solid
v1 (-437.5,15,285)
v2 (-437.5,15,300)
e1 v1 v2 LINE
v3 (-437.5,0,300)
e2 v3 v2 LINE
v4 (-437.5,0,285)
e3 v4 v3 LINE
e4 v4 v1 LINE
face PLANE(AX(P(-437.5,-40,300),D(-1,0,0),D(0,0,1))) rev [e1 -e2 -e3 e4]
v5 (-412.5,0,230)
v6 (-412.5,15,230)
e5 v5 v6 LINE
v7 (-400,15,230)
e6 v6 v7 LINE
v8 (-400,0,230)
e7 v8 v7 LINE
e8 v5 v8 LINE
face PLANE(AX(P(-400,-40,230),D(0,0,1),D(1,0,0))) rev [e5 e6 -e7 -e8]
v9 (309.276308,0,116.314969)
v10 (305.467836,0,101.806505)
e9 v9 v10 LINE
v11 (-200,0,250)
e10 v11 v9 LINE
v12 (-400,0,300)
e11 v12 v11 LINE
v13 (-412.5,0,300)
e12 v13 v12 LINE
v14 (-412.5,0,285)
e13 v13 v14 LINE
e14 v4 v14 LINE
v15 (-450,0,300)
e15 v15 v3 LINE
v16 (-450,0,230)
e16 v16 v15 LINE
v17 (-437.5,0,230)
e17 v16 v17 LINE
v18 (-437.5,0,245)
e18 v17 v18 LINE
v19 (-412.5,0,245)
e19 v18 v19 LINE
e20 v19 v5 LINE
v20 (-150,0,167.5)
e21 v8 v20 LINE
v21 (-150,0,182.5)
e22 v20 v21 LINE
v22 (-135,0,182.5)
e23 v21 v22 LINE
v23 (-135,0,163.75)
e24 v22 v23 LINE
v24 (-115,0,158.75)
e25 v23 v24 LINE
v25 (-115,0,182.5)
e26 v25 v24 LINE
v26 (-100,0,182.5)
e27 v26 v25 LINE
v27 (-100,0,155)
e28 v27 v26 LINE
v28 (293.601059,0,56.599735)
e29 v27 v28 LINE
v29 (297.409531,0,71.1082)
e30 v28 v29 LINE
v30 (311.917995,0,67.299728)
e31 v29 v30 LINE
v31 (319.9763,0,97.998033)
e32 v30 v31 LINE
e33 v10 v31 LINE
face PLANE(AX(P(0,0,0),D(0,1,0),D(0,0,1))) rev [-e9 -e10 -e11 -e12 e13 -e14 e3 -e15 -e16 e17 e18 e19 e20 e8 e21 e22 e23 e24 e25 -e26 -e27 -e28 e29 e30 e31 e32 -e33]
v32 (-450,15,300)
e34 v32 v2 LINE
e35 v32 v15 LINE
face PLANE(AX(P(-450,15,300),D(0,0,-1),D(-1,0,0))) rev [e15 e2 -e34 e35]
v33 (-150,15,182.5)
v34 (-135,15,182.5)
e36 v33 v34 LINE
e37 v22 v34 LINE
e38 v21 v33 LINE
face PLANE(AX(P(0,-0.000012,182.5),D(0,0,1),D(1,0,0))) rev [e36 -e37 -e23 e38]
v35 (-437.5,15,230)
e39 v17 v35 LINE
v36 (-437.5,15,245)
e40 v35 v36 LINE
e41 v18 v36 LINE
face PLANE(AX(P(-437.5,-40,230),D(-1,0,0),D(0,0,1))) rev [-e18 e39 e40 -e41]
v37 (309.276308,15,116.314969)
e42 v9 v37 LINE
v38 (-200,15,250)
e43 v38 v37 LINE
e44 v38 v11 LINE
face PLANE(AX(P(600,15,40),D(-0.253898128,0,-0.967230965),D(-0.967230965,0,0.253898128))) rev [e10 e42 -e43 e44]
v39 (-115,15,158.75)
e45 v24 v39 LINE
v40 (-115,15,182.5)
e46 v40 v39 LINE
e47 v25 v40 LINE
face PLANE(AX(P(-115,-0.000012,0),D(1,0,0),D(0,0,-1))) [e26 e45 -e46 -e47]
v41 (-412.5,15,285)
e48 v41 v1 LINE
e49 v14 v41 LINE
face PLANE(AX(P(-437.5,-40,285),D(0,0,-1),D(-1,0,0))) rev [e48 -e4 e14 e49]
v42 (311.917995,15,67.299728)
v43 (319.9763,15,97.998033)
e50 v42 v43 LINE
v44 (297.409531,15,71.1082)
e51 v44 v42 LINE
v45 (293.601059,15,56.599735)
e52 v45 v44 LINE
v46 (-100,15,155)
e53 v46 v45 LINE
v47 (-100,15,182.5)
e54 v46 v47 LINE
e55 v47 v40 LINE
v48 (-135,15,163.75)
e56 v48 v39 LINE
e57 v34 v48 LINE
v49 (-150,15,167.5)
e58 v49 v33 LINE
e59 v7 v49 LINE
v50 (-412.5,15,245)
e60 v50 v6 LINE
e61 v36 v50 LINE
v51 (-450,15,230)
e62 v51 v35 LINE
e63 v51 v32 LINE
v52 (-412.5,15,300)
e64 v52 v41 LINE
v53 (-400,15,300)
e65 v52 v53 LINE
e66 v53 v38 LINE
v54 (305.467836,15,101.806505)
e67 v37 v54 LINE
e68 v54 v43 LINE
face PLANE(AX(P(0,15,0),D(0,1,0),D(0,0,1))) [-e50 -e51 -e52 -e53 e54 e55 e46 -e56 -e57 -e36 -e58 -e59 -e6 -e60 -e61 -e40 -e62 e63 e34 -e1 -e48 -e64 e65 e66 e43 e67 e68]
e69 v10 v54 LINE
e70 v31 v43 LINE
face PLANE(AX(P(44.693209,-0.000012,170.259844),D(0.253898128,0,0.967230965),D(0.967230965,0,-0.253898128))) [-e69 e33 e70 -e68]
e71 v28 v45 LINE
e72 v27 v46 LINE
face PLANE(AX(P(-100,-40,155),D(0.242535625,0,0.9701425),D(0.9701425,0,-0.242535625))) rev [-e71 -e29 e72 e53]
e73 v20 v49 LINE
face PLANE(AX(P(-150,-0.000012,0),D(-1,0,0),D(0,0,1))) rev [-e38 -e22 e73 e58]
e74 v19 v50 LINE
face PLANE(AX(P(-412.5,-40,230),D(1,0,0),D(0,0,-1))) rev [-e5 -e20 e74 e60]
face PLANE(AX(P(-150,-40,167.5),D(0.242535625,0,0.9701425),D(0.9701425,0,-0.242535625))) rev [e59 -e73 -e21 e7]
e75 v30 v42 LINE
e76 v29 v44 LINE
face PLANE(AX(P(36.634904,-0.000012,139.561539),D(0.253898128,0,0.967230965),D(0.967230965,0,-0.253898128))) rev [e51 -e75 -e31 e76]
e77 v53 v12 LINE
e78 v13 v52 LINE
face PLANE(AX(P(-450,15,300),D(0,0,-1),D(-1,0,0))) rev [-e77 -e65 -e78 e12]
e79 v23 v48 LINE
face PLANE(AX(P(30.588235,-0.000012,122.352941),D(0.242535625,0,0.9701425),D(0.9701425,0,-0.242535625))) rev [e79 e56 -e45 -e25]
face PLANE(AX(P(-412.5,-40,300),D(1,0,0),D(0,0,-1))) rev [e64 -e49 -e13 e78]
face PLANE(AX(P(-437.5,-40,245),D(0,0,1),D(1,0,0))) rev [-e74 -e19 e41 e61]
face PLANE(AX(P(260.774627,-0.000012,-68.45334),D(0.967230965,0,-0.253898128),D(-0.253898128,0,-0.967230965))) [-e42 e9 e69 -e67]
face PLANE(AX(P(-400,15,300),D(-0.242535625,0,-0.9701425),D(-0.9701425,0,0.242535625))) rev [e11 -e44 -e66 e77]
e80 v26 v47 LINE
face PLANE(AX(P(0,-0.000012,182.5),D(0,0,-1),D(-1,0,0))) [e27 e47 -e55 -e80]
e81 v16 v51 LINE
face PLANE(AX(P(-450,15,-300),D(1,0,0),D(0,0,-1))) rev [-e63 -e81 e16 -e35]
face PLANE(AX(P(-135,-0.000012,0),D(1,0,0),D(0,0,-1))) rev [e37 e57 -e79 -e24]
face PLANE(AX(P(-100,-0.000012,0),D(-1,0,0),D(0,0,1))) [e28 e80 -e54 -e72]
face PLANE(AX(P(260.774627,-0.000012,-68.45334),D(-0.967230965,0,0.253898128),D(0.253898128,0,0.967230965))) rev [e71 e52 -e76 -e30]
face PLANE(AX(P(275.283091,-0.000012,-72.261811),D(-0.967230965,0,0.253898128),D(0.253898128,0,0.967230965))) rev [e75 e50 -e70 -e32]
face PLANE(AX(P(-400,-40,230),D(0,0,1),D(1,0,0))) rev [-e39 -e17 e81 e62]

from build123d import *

# Parameters (mm, degrees)
BOSS_EXTRUDE1_DEPTH             = 15
BOSS_EXTRUDE2_REACH             = 1239.023
BOSS_EXTRUDE2_DIRECTION_2_REACH = 1239.023
CUT_EXTRUDE2_DEPTH              = 1238.578280352
CUT_EXTRUDE2_DEPTH_BACK         = 1238.578280352
SKETCH5_W                       = 40
SKETCH5_H                       = 40
CUT_EXTRUDE3_DEPTH              = 1238.578280352
BOSS_EXTRUDE4_DEPTH             = 75
CUT_EXTRUDE4_DEPTH              = 1241.107934819
CUT_EXTRUDE4_DEPTH_BACK         = 1241.107934819
SKETCH8_W                       = 15
SKETCH8_H                       = 73.7
FILLET1_R                       = 5
CUT_EXTRUDE5_DEPTH              = 1241.107934819
CUT_EXTRUDE5_DEPTH_BACK         = 1241.107934819
SKETCH9_W                       = 25
SKETCH9_H                       = 15
SKETCH9_W_2                     = 15
CUT_EXTRUDE6_DEPTH              = 1241.107934819
CUT_EXTRUDE6_DEPTH_BACK         = 1241.107934819
SKETCH10_W                      = 1728.920732784
SKETCH10_H                      = 178.853868908
SKETCH10_W_2                    = 1650
SKETCH10_H_2                    = 15
CUT_EXTRUDE9_DEPTH              = 1238.022635201
CUT_EXTRUDE9_DEPTH_BACK         = 1238.022635201
SKETCH11_W                      = 1852.680615207
SKETCH11_H                      = 1075.927112831


with BuildPart() as part:
    # Sketch1 → Boss-Extrude1 (new body)
    with BuildSketch(Plane(origin=(0, 0, 0), x_dir=(1, 0, 0), z_dir=(0, 1, 0))):
        Polygon((-450, 300), (-400, 300), (-200, 250), (600, 40), (1200, 40), (1200, -40), (600, -40), (-200, -250), (-400, -300), (-450, -300), align=None)
    extrude(amount=BOSS_EXTRUDE1_DEPTH)

    # Boss-Extrude2: up to this face of the body (flat: up to its plane)
    boss_extrude2_end = Plane(part.part.faces().sort_by_distance((-425, 7.5, 300))[0])
    # Sketch2 → Boss-Extrude2 (add, up to the picked face)
    with BuildSketch(Plane.XY, mode=Mode.PRIVATE) as boss_extrude2_sk1:
        with BuildLine():
            Line((-425, 0), (-450, 0))
            Line((-450, 0), (-450, -40))
            Line((-450, -40), (-440, -40))
            Line((-440, -40), (-440, -15))
            ThreePointArc((-440, -15), (-435.606601718, -4.393398282), (-425, 0))
        make_face()
    boss_extrude2_tool1 = split(extrude(boss_extrude2_sk1.sketch, amount=BOSS_EXTRUDE2_REACH, mode=Mode.PRIVATE), bisect_by=boss_extrude2_end, keep=Keep.BOTH, mode=Mode.PRIVATE)
    # Sketch2 → Boss-Extrude2 (add, up to the picked face)
    with BuildSketch(Plane.XY, mode=Mode.PRIVATE) as boss_extrude2_sk2:
        with BuildLine():
            Line((-400, 0), (-425, 0))
            ThreePointArc((-425, 0), (-414.393398282, -4.393398282), (-410, -15))
            Line((-410, -15), (-410, -40))
            Line((-410, -40), (-400, -40))
            Line((-400, -40), (-400, 0))
        make_face()
    boss_extrude2_tool2 = split(extrude(boss_extrude2_sk2.sketch, amount=BOSS_EXTRUDE2_REACH, mode=Mode.PRIVATE), bisect_by=boss_extrude2_end, keep=Keep.BOTH, mode=Mode.PRIVATE)
    add(boss_extrude2_tool1.solids().sort_by(Axis((-444.100555, -18.206662, 0), (0, 0, 1)))[0])
    add(boss_extrude2_tool2.solids().sort_by(Axis((-405.899445, -18.206662, 0), (0, 0, 1)))[0])

    # Boss-Extrude2 direction 2: up to this face of the body (flat: up to its plane)
    boss_extrude2_direction_2_end = Plane(part.part.faces().sort_by_distance((-425, 7.5, -300))[0])
    # Sketch2 → Boss-Extrude2 direction 2 (add, up to the picked face)
    with BuildSketch(Plane.XY, mode=Mode.PRIVATE) as boss_extrude2_direction_2_sk1:
        with BuildLine():
            Line((-425, 0), (-450, 0))
            Line((-450, 0), (-450, -40))
            Line((-450, -40), (-440, -40))
            Line((-440, -40), (-440, -15))
            ThreePointArc((-440, -15), (-435.606601718, -4.393398282), (-425, 0))
        make_face()
    boss_extrude2_direction_2_tool1 = split(extrude(boss_extrude2_direction_2_sk1.sketch, amount=-BOSS_EXTRUDE2_DIRECTION_2_REACH, mode=Mode.PRIVATE), bisect_by=boss_extrude2_direction_2_end, keep=Keep.BOTH, mode=Mode.PRIVATE)
    # Sketch2 → Boss-Extrude2 direction 2 (add, up to the picked face)
    with BuildSketch(Plane.XY, mode=Mode.PRIVATE) as boss_extrude2_direction_2_sk2:
        with BuildLine():
            Line((-400, 0), (-425, 0))
            ThreePointArc((-425, 0), (-414.393398282, -4.393398282), (-410, -15))
            Line((-410, -15), (-410, -40))
            Line((-410, -40), (-400, -40))
            Line((-400, -40), (-400, 0))
        make_face()
    boss_extrude2_direction_2_tool2 = split(extrude(boss_extrude2_direction_2_sk2.sketch, amount=-BOSS_EXTRUDE2_DIRECTION_2_REACH, mode=Mode.PRIVATE), bisect_by=boss_extrude2_direction_2_end, keep=Keep.BOTH, mode=Mode.PRIVATE)
    add(boss_extrude2_direction_2_tool1.solids().sort_by(Axis((-444.100555, -18.206662, 0), (0, 0, -1)))[0])
    add(boss_extrude2_direction_2_tool2.solids().sort_by(Axis((-405.899445, -18.206662, 0), (0, 0, -1)))[0])

    # Sketch4 → Cut-Extrude2 (cut, two sides: drawn at the far end of the back side and taken through both)
    with BuildSketch(Plane(origin=(0, 0, 0), x_dir=(1, 0, 0), z_dir=(0, 1, 0)).offset(-CUT_EXTRUDE2_DEPTH_BACK)):
        Polygon((-450, 230), (-400, 230), (-150, 167.5), (-150, -167.5), (-400, -230), (-450, -230), align=None)
        Polygon((-100, 155), (-100, -155), (520, 0), align=None)
    extrude(amount=CUT_EXTRUDE2_DEPTH + CUT_EXTRUDE2_DEPTH_BACK, mode=Mode.SUBTRACT)

    # Sketch5 → Cut-Extrude3 (cut, through all)
    with BuildSketch(Plane(origin=(0, 0, 0), x_dir=(0, 0, -1), z_dir=(1, 0, 0))):
        with Locations((-265, -20)):
            Rectangle(SKETCH5_W, SKETCH5_H)
        with Locations((265, -20)):
            Rectangle(SKETCH5_W, SKETCH5_H)
    extrude(amount=-CUT_EXTRUDE3_DEPTH, mode=Mode.SUBTRACT)

    # Sketch7 → Boss-Extrude4 (add)
    with BuildSketch(Plane(origin=(1200, 0, 0), x_dir=(0, 0, -1), z_dir=(1, 0, 0))):
        with BuildLine():
            Line((-87.5, 50), (-40, 15))
            Line((-40, 15), (40, 15))
            Line((40, 15), (87.5, 50))
            Line((87.5, 50), (87.5, 88.7))
            Line((87.5, 88.7), (58.5, 88.7))
            Line((58.5, 88.7), (58.5, 63.2))
            Line((58.5, 63.2), (48.5, 63.2))
            Line((48.5, 63.2), (48.5, 88.7))
            Line((48.5, 88.7), (20, 88.7))
            Line((20, 88.7), (20, 50))
            ThreePointArc((20, 50), (0, 30), (-20, 50))
            Line((-20, 50), (-20, 88.7))
            Line((-20, 88.7), (-63, 88.7))
            Line((-63, 88.7), (-63, 63.2))
            Line((-63, 63.2), (-73, 63.2))
            Line((-73, 63.2), (-73, 88.7))
            Line((-73, 88.7), (-87.5, 88.7))
            Line((-87.5, 88.7), (-87.5, 50))
        make_face()
    extrude(amount=-BOSS_EXTRUDE4_DEPTH)

    # Sketch8 → Cut-Extrude4 (cut, two sides: drawn at the far end of the back side and taken through both)
    with BuildSketch(Plane.XY.offset(-CUT_EXTRUDE4_DEPTH_BACK)):
        with Locations((1147.5, 51.85)):
            Rectangle(SKETCH8_W, SKETCH8_H)
        with Locations((1177.5, 51.85)):
            Rectangle(SKETCH8_W, SKETCH8_H)
    extrude(amount=CUT_EXTRUDE4_DEPTH + CUT_EXTRUDE4_DEPTH_BACK, mode=Mode.SUBTRACT)

    # Fillet1
    fillet1_edges = [part.edges().sort_by_distance(p)[0] for p in [
        (1192.5, 50, 87.5),
        (1162.5, 50, 87.5),
        (1132.5, 50, 87.5),
        (1192.5, 50, -87.5),
        (1162.5, 50, -87.5),
        (1132.5, 50, -87.5),
        (1192.5, 88.7, -87.5),
        (1162.5, 88.7, -87.5),
        (1132.5, 88.7, -87.5),
        (1132.5, 88.7, -58.5),
        (1162.5, 88.7, -58.5),
        (1192.5, 88.7, -58.5),
        (1192.5, 88.7, -48.5),
        (1162.5, 88.7, -48.5),
        (1132.5, 88.7, -48.5),
        (1192.5, 88.7, -20),
        (1162.5, 88.7, -20),
        (1132.5, 88.7, -20),
        (1192.5, 88.7, 63),
        (1162.5, 88.7, 63),
        (1132.5, 88.7, 63),
        (1132.5, 88.7, 87.5),
        (1162.5, 88.7, 87.5),
        (1192.5, 88.7, 87.5),
        (1192.5, 88.7, 73),
        (1162.5, 88.7, 73),
        (1132.5, 88.7, 73),
        (1192.5, 88.7, 20),
        (1162.5, 88.7, 20),
        (1132.5, 88.7, 20),
        (600, 7.5, 40),
        (600, 7.5, -40),
        (520, 7.5, 0),
        (-440, -40, -292.5),
        (-440, -40, -237.5),
        (-400, -40, -292.5),
        (-400, -40, -237.5),
        (-450, -40, -237.5),
        (-410, -40, -237.5),
        (-450, -40, -292.5),
        (-410, -40, -292.5),
        (-150, 7.5, 167.5),
        (-100, 7.5, 155),
        (-150, 7.5, -167.5),
        (-100, 7.5, -155),
        (-450, -40, 237.5),
        (-410, -40, 237.5),
        (-440, -40, 237.5),
        (-400, -40, 237.5),
        (-450, -40, 292.5),
        (-440, -40, 292.5),
        (-400, -40, 292.5),
        (-410, -40, 292.5),
    ]]
    fillet(fillet1_edges, radius=FILLET1_R - 0.0001)  # a hair under: the kernel refuses the full size

    # Sketch9 → Cut-Extrude5 (cut, two sides: drawn at the far end of the back side and taken through both)
    with BuildSketch(Plane(origin=(0, 0, 0), x_dir=(1, 0, 0), z_dir=(0, 1, 0)).offset(-CUT_EXTRUDE5_DEPTH_BACK)):
        with Locations((-425, -292.5)):
            Rectangle(SKETCH9_W, SKETCH9_H)
        with Locations((1192.5, -32.5)):
            Rectangle(SKETCH9_W_2, SKETCH9_H)
        with Locations((1192.5, 32.5)):
            Rectangle(SKETCH9_W_2, SKETCH9_H)
        with Locations((1162.5, 32.5)):
            Rectangle(SKETCH9_W_2, SKETCH9_H)
        with Locations((1132.5, 32.5)):
            Rectangle(SKETCH9_W_2, SKETCH9_H)
        with Locations((1132.5, -32.5)):
            Rectangle(SKETCH9_W_2, SKETCH9_H)
        with Locations((1162.5, -32.5)):
            Rectangle(SKETCH9_W_2, SKETCH9_H)
        with Locations((-425, -237.5)):
            Rectangle(SKETCH9_W, SKETCH9_H)
        with Locations((-425, 237.5)):
            Rectangle(SKETCH9_W, SKETCH9_H)
        with Locations((-425, 292.5)):
            Rectangle(SKETCH9_W, SKETCH9_H)
    extrude(amount=CUT_EXTRUDE5_DEPTH + CUT_EXTRUDE5_DEPTH_BACK, mode=Mode.SUBTRACT)


with BuildPart() as cut_extrude5_piece_1:
    # of the separate pieces the step leaves, piece 1, a body of its own (cut_extrude5_pieces)
    add(part.part.solids().sort_by_distance((-400, -35.0001, -300))[0])


with BuildPart() as cut_extrude5_piece_2:
    # of the separate pieces the step leaves, piece 2, a body of its own (cut_extrude5_pieces)
    add(part.part.solids().sort_by_distance((1170, 48.501289589, 85.46603587))[0])


with BuildPart() as cut_extrude5_piece_3:
    # of the separate pieces the step leaves, piece 3, a body of its own (cut_extrude5_pieces)
    add(part.part.solids().sort_by_distance((1170, 48.501289589, -85.46603587))[0])


with BuildPart() as cut_extrude5_piece_4:
    # of the separate pieces the step leaves, piece 4, a body of its own (cut_extrude5_pieces)
    add(part.part.solids().sort_by_distance((1125, 83.7001, 73))[0])


with BuildPart() as cut_extrude5_piece_5:
    # of the separate pieces the step leaves, piece 5, a body of its own (cut_extrude5_pieces)
    add(part.part.solids().sort_by_distance((1200, 48.501289589, 85.46603587))[0])


with BuildPart() as cut_extrude5_piece_6:
    # of the separate pieces the step leaves, piece 6, a body of its own (cut_extrude5_pieces)
    add(part.part.solids().sort_by_distance((1200, 48.501289589, -85.46603587))[0])


with BuildPart() as cut_extrude5_piece_7:
    # of the separate pieces the step leaves, piece 7, a body of its own (cut_extrude5_pieces)
    add(part.part.solids().sort_by_distance((1125, 88.7, -40))[0])


with BuildPart() as cut_extrude6_tool:
    # Sketch10 → Cut-Extrude6 (new, two sides: drawn at the far end of the back side and taken through both)
    with BuildSketch(Plane.XY.offset(-CUT_EXTRUDE6_DEPTH_BACK)):
        with Locations((378.379601058, 20.599691165)):
            Rectangle(SKETCH10_W, SKETCH10_H)
        with Locations((375, 7.5)):
            Rectangle(SKETCH10_W_2, SKETCH10_H_2, mode=Mode.SUBTRACT)
    extrude(amount=CUT_EXTRUDE6_DEPTH + CUT_EXTRUDE6_DEPTH_BACK)


with BuildPart() as cut_extrude5_piece_1_1:
    add(cut_extrude5_piece_1.part)

    # Cut-Extrude6: cut by cut_extrude6_tool
    add(cut_extrude6_tool.part, mode=Mode.SUBTRACT)

    # Sketch11 → Cut-Extrude9 (cut, two sides: drawn at the far end of the back side and taken through both)
    # profile 1 of 5: a face of its own
    with BuildSketch(Plane(origin=(0, 0, 0), x_dir=(1, 0, 0), z_dir=(0, 1, 0)).offset(-CUT_EXTRUDE9_DEPTH_BACK)):
        with Locations((324.970767393, -26.108881651)):
            Rectangle(SKETCH11_W, SKETCH11_H)
        Polygon((309.276307823, -116.314969197), (-450, -315.625), (-450, -242.5), (-450, -230), (-400, -230), (-150, -167.5), (-135, -163.75), (-115, -158.75), (-100, -155), (293.601058917, -56.599735271), (308.154197556, -52.961450611), (311.917995324, -67.299727825), (319.976300377, -97.99803279), (323.784772304, -112.50649727), align=None, mode=Mode.SUBTRACT)
    # profile 2 of 5: a face of its own
    with BuildSketch(Plane(origin=(0, 0, 0), x_dir=(1, 0, 0), z_dir=(0, 1, 0)).offset(-CUT_EXTRUDE9_DEPTH_BACK)):
        Polygon((-135, -163.75), (-150, -167.5), (-150, -182.5), (-135, -182.5), align=None)
    # profile 3 of 5: a face of its own
    with BuildSketch(Plane(origin=(0, 0, 0), x_dir=(1, 0, 0), z_dir=(0, 1, 0)).offset(-CUT_EXTRUDE9_DEPTH_BACK)):
        Polygon((-100, -155), (-115, -158.75), (-115, -182.5), (-100, -182.5), align=None)
    # profile 4 of 5: a face of its own
    with BuildSketch(Plane(origin=(0, 0, 0), x_dir=(1, 0, 0), z_dir=(0, 1, 0)).offset(-CUT_EXTRUDE9_DEPTH_BACK)):
        Polygon((305.467835897, -101.806504716), (309.276307823, -116.314969197), (323.784772304, -112.50649727), (319.976300377, -97.99803279), align=None)
    # profile 5 of 5: a face of its own
    with BuildSketch(Plane(origin=(0, 0, 0), x_dir=(1, 0, 0), z_dir=(0, 1, 0)).offset(-CUT_EXTRUDE9_DEPTH_BACK)):
        Polygon((297.409530844, -71.108199751), (311.917995324, -67.299727825), (308.154197556, -52.961450611), (293.601058917, -56.599735271), align=None)
    extrude(amount=CUT_EXTRUDE9_DEPTH + CUT_EXTRUDE9_DEPTH_BACK, mode=Mode.SUBTRACT)


with BuildPart() as cut_extrude5_piece_2_1:
    add(cut_extrude5_piece_2.part)

    # Cut-Extrude6: cut by cut_extrude6_tool
    add(cut_extrude6_tool.part, mode=Mode.SUBTRACT)


with BuildPart() as cut_extrude5_piece_3_1:
    add(cut_extrude5_piece_3.part)

    # Cut-Extrude6: cut by cut_extrude6_tool
    add(cut_extrude6_tool.part, mode=Mode.SUBTRACT)


with BuildPart() as cut_extrude5_piece_4_1:
    add(cut_extrude5_piece_4.part)

    # Cut-Extrude6: cut by cut_extrude6_tool
    add(cut_extrude6_tool.part, mode=Mode.SUBTRACT)


with BuildPart() as cut_extrude5_piece_5_1:
    add(cut_extrude5_piece_5.part)

    # Cut-Extrude6: cut by cut_extrude6_tool
    add(cut_extrude6_tool.part, mode=Mode.SUBTRACT)


with BuildPart() as cut_extrude5_piece_6_1:
    add(cut_extrude5_piece_6.part)

    # Cut-Extrude6: cut by cut_extrude6_tool
    add(cut_extrude6_tool.part, mode=Mode.SUBTRACT)


with BuildPart() as cut_extrude5_piece_7_1:
    add(cut_extrude5_piece_7.part)

    # Cut-Extrude6: cut by cut_extrude6_tool
    add(cut_extrude6_tool.part, mode=Mode.SUBTRACT)


solid = cut_extrude5_piece_1_1.part
